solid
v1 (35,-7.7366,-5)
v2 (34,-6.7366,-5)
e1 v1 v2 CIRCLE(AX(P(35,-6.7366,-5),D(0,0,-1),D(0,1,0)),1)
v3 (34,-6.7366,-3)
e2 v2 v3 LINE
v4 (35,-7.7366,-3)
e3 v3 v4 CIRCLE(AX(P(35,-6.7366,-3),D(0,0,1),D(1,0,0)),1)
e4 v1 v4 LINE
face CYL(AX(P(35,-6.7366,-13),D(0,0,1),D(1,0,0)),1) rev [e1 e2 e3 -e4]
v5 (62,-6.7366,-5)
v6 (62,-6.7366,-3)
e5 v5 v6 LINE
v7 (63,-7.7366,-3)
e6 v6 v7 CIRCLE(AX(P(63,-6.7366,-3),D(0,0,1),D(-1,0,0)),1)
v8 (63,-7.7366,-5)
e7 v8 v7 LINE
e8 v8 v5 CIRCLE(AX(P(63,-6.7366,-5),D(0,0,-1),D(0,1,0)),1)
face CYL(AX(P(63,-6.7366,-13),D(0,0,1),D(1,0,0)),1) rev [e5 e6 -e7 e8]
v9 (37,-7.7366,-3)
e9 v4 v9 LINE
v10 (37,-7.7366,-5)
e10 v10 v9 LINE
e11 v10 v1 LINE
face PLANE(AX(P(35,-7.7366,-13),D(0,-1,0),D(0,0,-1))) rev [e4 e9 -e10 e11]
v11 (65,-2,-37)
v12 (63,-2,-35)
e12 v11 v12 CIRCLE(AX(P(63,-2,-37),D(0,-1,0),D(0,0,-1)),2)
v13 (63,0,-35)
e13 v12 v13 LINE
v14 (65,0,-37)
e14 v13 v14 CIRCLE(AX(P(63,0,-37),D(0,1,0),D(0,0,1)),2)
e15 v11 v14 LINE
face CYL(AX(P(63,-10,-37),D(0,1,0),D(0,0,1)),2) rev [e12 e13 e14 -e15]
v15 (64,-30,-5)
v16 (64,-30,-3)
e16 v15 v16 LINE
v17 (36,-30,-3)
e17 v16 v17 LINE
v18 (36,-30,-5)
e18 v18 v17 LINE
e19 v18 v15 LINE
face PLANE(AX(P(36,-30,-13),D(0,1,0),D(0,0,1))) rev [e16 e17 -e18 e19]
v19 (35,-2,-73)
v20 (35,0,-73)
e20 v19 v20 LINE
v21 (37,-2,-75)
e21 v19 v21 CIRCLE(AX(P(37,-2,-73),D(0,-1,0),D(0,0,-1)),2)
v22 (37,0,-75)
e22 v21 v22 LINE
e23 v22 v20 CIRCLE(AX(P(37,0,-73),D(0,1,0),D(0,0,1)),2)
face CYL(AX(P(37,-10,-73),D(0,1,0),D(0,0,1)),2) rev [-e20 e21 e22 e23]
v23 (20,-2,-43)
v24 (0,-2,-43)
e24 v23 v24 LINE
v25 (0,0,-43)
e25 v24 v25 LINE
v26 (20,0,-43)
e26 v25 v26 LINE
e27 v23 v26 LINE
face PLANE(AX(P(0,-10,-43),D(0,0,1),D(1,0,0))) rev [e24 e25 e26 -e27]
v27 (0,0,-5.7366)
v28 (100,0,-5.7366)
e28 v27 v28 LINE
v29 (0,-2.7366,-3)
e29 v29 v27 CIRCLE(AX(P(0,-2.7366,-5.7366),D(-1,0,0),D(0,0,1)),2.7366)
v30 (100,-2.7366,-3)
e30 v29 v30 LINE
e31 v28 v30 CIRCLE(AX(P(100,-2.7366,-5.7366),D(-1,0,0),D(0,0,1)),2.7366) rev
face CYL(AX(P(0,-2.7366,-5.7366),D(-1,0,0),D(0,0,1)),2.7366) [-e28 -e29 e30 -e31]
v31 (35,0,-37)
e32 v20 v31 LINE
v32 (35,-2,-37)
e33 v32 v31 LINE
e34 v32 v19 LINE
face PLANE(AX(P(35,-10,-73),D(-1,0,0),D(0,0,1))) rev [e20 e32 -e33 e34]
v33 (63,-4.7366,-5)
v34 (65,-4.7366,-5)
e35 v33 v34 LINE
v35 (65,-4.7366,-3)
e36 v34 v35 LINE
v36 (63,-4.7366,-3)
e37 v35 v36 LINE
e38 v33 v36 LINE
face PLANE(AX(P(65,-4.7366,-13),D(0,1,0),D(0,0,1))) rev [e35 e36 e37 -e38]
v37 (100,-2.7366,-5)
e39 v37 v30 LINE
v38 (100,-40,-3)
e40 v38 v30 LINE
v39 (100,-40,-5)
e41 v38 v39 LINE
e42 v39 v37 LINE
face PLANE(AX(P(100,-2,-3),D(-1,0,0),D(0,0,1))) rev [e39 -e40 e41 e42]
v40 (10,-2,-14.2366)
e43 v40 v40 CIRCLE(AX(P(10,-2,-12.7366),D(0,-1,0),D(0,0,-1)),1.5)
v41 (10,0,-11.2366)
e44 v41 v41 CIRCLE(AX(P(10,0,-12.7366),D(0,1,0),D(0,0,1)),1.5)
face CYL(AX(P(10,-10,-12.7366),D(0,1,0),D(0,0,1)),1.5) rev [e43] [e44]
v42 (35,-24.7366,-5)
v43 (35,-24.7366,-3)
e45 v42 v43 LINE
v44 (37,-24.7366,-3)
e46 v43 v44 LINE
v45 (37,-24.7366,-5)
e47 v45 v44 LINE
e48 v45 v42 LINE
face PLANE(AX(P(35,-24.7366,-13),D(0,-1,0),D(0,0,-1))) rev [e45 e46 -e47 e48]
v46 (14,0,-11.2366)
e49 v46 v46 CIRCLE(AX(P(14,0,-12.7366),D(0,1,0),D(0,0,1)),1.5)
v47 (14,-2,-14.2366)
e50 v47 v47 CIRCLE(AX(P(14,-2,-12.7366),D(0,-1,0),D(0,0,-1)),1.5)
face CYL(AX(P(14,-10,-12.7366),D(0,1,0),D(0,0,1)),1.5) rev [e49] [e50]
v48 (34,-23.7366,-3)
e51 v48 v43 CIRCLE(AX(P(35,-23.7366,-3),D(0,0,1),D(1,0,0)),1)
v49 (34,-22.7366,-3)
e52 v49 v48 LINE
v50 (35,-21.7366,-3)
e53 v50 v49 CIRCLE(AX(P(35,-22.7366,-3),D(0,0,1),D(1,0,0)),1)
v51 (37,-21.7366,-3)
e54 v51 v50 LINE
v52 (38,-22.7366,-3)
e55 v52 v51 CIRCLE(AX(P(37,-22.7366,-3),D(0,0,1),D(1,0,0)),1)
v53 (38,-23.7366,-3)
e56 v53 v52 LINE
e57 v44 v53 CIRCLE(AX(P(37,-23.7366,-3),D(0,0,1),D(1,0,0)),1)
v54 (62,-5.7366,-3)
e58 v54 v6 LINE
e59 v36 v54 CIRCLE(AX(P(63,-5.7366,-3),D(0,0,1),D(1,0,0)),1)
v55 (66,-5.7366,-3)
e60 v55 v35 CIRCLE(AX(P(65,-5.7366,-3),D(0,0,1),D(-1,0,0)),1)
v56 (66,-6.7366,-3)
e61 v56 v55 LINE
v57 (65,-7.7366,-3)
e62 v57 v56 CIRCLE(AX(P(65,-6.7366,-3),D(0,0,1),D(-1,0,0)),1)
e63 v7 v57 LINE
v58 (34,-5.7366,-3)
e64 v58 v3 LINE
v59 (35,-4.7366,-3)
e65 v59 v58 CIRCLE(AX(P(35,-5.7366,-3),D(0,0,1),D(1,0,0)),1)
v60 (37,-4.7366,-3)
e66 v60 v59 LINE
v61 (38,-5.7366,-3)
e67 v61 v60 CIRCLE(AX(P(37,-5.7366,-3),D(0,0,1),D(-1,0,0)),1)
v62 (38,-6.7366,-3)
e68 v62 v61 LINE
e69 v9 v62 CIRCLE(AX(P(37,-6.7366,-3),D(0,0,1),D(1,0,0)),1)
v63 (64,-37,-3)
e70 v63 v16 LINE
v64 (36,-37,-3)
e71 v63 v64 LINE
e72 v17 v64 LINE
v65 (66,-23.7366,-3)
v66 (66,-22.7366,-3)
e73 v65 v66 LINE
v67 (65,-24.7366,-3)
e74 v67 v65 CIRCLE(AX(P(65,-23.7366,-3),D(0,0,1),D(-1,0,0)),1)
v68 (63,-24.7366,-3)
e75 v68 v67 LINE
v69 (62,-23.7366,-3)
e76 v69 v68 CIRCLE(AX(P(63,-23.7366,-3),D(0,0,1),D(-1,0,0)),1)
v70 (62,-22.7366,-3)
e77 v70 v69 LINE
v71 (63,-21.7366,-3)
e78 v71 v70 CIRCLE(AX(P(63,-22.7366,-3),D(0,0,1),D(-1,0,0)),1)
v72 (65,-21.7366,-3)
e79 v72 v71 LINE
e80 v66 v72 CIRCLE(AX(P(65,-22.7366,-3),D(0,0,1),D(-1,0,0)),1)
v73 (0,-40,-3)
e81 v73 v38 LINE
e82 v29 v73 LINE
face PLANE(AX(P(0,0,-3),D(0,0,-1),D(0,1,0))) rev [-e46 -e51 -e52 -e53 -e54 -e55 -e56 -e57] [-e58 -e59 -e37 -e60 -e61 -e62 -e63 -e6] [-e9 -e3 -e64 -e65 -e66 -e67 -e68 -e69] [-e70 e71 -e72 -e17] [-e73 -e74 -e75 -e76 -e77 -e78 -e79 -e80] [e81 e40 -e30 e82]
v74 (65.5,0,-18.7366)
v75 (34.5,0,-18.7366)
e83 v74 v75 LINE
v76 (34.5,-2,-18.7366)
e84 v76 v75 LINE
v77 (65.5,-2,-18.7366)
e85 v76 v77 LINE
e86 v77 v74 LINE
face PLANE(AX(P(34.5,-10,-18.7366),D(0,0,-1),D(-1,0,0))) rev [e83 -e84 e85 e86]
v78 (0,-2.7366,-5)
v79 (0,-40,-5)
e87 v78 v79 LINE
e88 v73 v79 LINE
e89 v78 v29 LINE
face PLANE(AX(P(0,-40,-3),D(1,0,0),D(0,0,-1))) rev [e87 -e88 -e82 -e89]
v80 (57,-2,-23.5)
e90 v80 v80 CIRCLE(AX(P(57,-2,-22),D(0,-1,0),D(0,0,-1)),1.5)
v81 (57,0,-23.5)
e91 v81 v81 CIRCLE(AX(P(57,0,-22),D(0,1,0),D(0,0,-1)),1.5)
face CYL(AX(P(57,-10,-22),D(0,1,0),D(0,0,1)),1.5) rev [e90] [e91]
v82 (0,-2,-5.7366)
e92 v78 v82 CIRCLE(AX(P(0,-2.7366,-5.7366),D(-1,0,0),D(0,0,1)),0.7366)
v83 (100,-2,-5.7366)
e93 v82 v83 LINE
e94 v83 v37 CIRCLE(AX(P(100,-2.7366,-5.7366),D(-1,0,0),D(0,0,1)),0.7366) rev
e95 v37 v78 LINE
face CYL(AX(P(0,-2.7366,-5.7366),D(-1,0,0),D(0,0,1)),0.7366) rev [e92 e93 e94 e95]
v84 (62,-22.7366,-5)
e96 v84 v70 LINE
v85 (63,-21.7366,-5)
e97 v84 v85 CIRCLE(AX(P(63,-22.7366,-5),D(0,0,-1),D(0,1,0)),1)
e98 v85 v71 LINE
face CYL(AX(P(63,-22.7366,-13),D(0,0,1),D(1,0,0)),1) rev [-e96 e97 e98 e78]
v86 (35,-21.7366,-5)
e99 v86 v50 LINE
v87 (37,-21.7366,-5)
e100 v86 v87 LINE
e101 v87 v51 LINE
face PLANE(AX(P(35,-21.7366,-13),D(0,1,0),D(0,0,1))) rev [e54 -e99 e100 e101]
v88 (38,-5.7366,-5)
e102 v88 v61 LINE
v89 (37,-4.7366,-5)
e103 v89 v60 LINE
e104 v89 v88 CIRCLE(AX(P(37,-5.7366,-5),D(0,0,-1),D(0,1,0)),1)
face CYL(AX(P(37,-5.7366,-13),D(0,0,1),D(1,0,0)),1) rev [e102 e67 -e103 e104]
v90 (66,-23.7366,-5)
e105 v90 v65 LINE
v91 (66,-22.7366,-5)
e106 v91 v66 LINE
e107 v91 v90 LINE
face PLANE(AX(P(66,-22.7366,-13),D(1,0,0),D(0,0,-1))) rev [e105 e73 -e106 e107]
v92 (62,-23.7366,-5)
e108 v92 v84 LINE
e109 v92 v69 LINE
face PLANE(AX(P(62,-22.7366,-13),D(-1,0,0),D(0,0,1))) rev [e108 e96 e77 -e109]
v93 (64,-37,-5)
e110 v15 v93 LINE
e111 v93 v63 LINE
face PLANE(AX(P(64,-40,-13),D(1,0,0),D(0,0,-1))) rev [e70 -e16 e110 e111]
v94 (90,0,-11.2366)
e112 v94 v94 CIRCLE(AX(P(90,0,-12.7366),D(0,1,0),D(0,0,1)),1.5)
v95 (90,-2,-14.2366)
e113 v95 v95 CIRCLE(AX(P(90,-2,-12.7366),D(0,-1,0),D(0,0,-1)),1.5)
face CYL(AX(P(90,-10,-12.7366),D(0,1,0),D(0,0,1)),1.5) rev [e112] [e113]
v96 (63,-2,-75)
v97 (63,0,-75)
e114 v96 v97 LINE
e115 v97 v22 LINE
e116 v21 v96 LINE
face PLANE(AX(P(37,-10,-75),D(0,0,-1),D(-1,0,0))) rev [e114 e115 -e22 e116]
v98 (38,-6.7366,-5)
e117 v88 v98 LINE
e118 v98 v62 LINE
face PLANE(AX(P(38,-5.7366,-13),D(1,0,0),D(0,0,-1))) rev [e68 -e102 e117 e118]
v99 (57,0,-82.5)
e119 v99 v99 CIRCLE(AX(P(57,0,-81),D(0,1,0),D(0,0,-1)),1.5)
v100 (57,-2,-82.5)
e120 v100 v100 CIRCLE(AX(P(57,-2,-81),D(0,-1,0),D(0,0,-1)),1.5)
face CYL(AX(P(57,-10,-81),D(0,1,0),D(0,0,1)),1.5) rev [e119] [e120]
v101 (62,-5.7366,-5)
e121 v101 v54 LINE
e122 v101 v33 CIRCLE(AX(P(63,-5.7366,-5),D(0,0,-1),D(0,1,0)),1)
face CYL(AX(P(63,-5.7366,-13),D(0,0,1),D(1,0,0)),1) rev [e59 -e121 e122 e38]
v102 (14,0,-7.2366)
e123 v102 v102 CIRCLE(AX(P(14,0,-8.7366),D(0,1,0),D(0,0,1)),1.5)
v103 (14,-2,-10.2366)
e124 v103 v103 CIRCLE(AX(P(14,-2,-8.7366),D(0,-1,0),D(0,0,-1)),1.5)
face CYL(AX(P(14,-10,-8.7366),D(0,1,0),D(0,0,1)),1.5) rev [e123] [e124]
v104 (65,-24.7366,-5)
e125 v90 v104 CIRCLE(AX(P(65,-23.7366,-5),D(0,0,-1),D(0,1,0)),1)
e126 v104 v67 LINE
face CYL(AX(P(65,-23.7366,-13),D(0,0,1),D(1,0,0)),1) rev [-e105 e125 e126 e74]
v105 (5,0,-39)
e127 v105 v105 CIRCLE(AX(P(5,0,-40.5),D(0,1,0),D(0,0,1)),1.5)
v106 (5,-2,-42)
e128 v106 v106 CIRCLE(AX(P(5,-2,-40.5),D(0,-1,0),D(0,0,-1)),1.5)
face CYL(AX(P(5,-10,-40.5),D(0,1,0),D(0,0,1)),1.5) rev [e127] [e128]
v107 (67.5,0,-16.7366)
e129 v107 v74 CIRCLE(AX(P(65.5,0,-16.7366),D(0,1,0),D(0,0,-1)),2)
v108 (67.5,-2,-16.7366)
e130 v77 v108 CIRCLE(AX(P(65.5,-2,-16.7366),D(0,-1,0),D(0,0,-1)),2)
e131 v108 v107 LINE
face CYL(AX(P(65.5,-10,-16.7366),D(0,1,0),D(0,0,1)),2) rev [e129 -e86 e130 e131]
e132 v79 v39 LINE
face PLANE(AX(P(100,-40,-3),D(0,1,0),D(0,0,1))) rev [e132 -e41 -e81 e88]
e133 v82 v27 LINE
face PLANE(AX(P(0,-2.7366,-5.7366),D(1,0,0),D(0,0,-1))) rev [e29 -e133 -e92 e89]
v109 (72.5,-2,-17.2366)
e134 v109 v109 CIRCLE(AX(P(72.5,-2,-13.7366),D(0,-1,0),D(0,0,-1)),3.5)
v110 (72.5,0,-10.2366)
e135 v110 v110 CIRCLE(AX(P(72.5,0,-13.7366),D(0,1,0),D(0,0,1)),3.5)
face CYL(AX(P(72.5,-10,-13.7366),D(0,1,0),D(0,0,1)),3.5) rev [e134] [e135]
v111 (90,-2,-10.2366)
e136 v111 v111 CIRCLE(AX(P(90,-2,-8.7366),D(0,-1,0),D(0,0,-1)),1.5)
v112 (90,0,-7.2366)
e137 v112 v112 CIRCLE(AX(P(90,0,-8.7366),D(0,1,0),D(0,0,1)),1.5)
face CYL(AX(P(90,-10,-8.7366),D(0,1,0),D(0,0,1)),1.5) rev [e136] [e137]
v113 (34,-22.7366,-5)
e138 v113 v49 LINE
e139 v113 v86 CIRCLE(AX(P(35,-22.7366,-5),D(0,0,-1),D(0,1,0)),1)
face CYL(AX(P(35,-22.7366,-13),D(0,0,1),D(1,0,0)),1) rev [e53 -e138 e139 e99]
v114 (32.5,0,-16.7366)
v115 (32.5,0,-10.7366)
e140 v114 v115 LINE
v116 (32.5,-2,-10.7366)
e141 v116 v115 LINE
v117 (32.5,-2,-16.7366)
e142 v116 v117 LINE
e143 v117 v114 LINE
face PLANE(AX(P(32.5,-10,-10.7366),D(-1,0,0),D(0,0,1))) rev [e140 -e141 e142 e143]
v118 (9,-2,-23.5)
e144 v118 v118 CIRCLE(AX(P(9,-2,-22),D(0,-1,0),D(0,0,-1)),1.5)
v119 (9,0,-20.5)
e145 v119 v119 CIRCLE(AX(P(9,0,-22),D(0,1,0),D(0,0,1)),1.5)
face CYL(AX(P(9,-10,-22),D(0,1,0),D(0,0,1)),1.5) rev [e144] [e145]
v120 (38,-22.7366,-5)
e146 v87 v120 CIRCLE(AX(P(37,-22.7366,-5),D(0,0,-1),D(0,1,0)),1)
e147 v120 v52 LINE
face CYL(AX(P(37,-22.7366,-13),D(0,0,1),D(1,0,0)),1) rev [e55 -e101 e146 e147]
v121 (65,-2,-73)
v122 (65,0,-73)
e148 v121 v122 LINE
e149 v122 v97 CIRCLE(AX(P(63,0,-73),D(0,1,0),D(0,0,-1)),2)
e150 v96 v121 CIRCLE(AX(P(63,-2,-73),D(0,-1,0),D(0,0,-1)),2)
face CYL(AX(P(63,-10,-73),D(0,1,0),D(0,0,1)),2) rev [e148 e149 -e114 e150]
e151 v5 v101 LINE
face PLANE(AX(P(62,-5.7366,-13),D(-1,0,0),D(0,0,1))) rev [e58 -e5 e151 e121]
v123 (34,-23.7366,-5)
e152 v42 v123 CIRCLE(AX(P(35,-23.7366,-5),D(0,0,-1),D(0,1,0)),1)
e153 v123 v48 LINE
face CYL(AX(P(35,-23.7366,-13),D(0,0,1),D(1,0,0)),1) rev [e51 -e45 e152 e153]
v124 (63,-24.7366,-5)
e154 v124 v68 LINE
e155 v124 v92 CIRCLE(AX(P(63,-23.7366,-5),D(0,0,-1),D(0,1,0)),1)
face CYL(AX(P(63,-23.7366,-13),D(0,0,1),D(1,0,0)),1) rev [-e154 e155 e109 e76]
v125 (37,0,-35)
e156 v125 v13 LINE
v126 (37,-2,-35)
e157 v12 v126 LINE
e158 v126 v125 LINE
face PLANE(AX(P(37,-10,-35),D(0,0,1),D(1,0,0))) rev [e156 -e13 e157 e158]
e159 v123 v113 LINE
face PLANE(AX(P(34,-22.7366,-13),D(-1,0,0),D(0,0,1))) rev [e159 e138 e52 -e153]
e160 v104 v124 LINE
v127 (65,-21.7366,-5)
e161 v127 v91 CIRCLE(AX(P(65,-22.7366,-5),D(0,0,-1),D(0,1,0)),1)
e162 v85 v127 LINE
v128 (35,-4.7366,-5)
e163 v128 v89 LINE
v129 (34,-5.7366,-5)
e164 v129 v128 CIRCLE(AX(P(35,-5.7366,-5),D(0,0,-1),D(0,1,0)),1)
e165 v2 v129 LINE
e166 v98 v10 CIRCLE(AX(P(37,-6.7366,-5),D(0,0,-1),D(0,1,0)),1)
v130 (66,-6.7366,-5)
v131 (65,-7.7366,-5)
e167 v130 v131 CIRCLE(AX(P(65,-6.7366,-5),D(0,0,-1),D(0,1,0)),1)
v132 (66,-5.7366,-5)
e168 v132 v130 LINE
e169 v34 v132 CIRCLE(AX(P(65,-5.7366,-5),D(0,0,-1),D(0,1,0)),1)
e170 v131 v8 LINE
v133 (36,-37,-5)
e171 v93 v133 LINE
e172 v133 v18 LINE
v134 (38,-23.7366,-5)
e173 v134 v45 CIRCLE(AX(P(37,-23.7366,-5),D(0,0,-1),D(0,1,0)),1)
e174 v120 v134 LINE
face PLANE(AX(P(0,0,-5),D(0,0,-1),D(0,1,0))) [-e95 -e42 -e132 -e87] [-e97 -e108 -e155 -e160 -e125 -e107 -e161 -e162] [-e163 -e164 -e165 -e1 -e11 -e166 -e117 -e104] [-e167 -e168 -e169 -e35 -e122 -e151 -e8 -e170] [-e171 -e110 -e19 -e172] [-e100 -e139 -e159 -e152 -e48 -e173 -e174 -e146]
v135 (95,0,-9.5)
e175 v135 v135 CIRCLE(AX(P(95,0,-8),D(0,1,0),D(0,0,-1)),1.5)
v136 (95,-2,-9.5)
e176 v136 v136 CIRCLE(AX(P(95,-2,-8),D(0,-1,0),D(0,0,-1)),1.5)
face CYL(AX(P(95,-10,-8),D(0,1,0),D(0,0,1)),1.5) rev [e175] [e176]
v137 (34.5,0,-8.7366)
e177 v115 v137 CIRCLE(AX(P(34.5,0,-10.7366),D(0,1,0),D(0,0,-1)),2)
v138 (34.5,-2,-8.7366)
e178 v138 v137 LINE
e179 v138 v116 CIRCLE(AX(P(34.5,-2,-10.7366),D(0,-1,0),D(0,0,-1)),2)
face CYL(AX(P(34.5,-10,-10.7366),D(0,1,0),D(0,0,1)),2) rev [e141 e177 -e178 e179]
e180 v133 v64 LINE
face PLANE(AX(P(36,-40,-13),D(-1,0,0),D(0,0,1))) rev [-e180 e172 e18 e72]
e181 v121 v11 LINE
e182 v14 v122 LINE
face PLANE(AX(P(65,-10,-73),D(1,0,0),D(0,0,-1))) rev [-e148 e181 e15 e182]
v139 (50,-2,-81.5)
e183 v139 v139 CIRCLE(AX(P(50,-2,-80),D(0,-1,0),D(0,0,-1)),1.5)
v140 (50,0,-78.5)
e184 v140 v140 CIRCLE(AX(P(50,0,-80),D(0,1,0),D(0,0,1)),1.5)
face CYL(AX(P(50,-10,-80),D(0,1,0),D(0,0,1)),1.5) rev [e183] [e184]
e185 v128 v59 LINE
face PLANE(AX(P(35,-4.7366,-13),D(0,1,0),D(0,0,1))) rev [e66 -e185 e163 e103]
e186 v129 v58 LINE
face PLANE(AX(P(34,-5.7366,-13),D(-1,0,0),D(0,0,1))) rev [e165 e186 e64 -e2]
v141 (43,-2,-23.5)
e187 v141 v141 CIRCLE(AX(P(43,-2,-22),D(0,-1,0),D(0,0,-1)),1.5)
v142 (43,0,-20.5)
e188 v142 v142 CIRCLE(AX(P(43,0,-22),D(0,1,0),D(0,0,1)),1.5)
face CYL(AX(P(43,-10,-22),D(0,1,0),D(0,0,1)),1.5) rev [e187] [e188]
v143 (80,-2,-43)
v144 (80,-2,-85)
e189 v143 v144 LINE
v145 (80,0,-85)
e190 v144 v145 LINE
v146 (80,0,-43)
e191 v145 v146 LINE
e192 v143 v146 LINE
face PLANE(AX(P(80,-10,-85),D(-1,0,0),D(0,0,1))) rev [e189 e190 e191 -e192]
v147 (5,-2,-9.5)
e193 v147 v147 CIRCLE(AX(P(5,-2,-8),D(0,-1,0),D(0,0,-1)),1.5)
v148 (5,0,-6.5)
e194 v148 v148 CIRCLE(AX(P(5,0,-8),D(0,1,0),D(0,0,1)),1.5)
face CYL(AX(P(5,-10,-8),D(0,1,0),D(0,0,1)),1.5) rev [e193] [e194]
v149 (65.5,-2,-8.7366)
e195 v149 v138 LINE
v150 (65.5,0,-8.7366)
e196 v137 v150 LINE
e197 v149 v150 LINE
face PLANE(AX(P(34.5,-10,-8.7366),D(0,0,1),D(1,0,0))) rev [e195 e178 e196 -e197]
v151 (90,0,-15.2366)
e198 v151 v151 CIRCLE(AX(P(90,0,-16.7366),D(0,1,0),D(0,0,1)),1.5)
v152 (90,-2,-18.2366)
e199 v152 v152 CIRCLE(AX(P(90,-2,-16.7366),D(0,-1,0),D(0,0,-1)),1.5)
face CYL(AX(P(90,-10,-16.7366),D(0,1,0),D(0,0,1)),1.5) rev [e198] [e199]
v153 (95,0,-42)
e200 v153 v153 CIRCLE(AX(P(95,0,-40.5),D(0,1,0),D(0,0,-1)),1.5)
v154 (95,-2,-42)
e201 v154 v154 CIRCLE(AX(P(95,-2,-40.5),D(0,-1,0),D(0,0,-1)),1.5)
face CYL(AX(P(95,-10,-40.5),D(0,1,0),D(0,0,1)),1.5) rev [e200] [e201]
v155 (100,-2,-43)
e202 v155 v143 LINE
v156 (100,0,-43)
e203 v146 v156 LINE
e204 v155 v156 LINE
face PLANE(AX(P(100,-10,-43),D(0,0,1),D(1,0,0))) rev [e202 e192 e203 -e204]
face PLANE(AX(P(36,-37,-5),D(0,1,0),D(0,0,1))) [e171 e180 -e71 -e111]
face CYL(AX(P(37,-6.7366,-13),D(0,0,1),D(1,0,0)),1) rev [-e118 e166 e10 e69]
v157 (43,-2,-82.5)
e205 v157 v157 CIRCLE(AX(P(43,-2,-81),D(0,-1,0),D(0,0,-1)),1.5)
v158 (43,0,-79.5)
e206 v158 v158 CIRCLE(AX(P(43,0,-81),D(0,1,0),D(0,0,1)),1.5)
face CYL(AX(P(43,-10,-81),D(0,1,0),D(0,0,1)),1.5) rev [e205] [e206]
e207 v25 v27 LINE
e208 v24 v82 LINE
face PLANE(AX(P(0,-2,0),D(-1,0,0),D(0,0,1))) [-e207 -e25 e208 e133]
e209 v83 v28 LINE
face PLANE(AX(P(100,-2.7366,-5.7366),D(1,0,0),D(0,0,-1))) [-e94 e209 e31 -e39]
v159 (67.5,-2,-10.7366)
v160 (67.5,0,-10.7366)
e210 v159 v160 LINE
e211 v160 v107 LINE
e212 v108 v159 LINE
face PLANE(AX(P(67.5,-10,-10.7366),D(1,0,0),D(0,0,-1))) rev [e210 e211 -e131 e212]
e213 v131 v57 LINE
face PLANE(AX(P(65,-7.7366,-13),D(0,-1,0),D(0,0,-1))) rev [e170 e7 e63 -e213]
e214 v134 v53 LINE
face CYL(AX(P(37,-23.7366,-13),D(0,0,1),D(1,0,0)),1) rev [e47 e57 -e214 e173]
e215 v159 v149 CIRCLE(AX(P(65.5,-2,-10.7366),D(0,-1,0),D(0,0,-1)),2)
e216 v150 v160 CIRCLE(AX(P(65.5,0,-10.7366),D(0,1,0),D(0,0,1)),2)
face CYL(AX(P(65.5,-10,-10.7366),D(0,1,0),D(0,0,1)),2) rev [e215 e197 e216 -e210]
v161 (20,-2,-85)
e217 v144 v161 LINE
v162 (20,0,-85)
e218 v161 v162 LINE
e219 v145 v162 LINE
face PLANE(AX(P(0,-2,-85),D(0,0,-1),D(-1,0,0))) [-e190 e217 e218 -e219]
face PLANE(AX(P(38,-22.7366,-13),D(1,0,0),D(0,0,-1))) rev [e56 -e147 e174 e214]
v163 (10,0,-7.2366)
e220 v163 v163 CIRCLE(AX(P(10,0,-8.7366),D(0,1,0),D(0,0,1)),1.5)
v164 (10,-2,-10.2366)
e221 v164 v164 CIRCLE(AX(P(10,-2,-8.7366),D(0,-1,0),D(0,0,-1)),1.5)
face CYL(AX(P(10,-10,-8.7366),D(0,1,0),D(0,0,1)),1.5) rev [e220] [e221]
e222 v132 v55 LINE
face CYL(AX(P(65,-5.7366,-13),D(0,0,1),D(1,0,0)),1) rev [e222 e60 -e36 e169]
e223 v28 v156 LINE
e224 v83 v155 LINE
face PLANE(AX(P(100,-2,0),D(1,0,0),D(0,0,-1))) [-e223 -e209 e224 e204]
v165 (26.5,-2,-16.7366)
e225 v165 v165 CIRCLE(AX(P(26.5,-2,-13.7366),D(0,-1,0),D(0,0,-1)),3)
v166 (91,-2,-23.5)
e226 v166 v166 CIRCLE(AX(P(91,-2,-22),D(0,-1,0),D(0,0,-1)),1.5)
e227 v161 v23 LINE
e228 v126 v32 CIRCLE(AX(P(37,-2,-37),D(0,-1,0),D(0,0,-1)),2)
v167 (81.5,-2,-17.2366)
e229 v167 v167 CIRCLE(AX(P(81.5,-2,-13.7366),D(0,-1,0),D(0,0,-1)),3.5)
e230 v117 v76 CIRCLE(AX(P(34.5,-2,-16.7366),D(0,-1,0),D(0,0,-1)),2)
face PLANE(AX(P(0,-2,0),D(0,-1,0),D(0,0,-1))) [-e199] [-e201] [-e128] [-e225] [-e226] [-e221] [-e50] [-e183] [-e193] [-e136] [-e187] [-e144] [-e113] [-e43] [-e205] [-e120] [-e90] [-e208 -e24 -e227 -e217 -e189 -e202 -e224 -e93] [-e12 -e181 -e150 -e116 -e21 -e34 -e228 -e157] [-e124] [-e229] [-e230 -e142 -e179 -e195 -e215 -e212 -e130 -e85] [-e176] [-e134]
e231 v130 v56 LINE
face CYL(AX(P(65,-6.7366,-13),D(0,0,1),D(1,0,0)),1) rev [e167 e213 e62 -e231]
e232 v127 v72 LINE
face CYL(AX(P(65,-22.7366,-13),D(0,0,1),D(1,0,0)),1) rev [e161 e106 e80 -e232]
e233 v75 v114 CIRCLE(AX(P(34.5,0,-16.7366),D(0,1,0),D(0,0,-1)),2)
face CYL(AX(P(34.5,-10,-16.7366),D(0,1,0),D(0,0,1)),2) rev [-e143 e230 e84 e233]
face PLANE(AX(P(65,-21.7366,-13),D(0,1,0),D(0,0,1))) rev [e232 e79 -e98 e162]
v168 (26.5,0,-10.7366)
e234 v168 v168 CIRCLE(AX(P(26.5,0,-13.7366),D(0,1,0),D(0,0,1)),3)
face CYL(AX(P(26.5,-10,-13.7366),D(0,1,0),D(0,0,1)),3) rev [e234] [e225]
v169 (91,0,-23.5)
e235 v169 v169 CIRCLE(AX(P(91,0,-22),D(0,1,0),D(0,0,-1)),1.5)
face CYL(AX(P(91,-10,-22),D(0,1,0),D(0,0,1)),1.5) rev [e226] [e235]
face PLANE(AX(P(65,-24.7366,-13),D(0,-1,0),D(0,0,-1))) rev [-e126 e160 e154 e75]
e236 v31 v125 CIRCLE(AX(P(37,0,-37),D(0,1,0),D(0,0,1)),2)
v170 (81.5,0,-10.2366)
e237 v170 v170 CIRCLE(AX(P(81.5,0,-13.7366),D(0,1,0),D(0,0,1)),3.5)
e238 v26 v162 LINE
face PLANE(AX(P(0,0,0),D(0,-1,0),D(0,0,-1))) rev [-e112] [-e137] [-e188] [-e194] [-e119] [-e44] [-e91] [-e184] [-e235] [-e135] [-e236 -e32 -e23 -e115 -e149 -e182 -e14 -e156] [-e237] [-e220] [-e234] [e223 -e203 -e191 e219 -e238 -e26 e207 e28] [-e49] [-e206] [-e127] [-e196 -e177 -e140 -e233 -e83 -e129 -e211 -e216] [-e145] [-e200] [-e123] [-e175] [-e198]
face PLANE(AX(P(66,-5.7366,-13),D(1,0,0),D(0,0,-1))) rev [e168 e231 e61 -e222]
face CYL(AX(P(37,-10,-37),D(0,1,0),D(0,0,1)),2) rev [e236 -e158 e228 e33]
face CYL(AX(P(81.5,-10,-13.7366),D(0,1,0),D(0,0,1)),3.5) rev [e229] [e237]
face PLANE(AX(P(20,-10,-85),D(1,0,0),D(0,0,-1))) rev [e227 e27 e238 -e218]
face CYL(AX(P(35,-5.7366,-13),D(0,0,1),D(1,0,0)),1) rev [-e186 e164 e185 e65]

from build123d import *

# Parameters (mm, degrees)
SKETCH2_W                    = 100
SKETCH2_H                    = 85
BASE_FLANGE1_DEPTH           = 2
SKETCH15_R                   = 1.5
SKETCH15_W                   = 20
SKETCH15_H                   = 42
SKETCH15_W_2                 = 100
SKETCH15_H_2                 = 3
CUT_EXTRUDE2_DEPTH           = 10
EDGE_FLANGE3_STRIP_W         = 9.4732
EDGE_FLANGE3_STRIP_H         = 2
EDGE_FLANGE3_STRIP_CUT_DEPTH = 100
EDGE_FLANGE3_DEPTH           = 100
SKETCH23_W                   = 28
SKETCH23_H                   = 10
CUT_EXTRUDE3_DEPTH           = 10
SKETCH24_W                   = 28
SKETCH24_H                   = 3
TAB1_DEPTH                   = 2
SKETCH25_R                   = 1.5
CUT_EXTRUDE11_DEPTH          = 10
CUT_EXTRUDE7_DEPTH           = 10
CUT_EXTRUDE9_DEPTH           = 10
SKETCH34_R                   = 1.5
CUT_EXTRUDE10_DEPTH          = 10
SKETCH35_R                   = 3
SKETCH35_R_2                 = 3.5
CUT_EXTRUDE12_DEPTH          = 10


# Sheet-metal steps are written as plain solids
with BuildPart() as part:
    # Sketch2 → Base-Flange1 (new body)
    with BuildSketch(Plane(origin=(0, 0, 0), x_dir=(1, 0, 0), z_dir=(0, 1, 0))):
        with Locations((50, 42.5)):
            Rectangle(SKETCH2_W, SKETCH2_H)
    extrude(amount=-BASE_FLANGE1_DEPTH)

    # Sketch15 → Cut-Extrude2 (cut)
    with BuildSketch(Plane(origin=(0, 0, 0), x_dir=(1, 0, 0), z_dir=(0, 1, 0))):
        with Locations(Location((5, 8, 0), (0, 0, 270))):
            Circle(SKETCH15_R)
        with Locations(Location((5, 40.5, 0), (0, 0, 270))):
            Circle(SKETCH15_R)
        with Locations(Location((50, 80, 0), (0, 0, 270))):
            Circle(SKETCH15_R)
        with Locations(Location((95, 8, 0), (0, 0, 90))):
            Circle(SKETCH15_R)
        with Locations(Location((95, 40.5, 0), (0, 0, 90))):
            Circle(SKETCH15_R)
        with Locations((10, 64)):
            Rectangle(SKETCH15_W, SKETCH15_H)
        with Locations((90, 64)):
            Rectangle(SKETCH15_W, SKETCH15_H)
        with Locations((50, 1.5)):
            Rectangle(SKETCH15_W_2, SKETCH15_H_2)
    extrude(amount=-CUT_EXTRUDE2_DEPTH, mode=Mode.SUBTRACT)

    # Edge-Flange3 strip (across the edge) → Edge-Flange3 strip cut (cut)
    with BuildSketch(Plane(origin=(100, -2, -3), x_dir=(0, 0, -1), z_dir=(-1, 0, 0))):
        with Locations((-2, -1)):
            Rectangle(EDGE_FLANGE3_STRIP_W, EDGE_FLANGE3_STRIP_H)
    extrude(amount=EDGE_FLANGE3_STRIP_CUT_DEPTH, mode=Mode.SUBTRACT)

    # Edge-Flange3 section (across the edge) → Edge-Flange3 (add)
    with BuildSketch(Plane(origin=(100, -2, -3), x_dir=(0, 0, -1), z_dir=(-1, 0, 0))):
        with BuildLine():
            Line((0, 0.7366), (0, 38))
            Line((0, 38), (2, 38))
            Line((2, 38), (2, 0.7366))
            ThreePointArc((2, 0.7366), (2.215745145, 0.215745145), (2.7366, 0))
            Line((2.7366, 0), (2.7366, -2))
            ThreePointArc((2.7366, -2), (0.801531583, -1.198468417), (0, 0.7366))
        make_face()
    extrude(amount=EDGE_FLANGE3_DEPTH)

    # Sketch23 → Cut-Extrude3 (cut)
    with BuildSketch(Plane.XY.offset(-3)):
        with Locations((50, -35)):
            Rectangle(SKETCH23_W, SKETCH23_H)
    extrude(amount=-CUT_EXTRUDE3_DEPTH, mode=Mode.SUBTRACT)

    # Sketch24 → Tab1 (add)
    with BuildSketch(Plane.XY.offset(-3)):
        with Locations((50, -38.5)):
            Rectangle(SKETCH24_W, SKETCH24_H)
    extrude(amount=-TAB1_DEPTH)

    # Sketch25 → Cut-Extrude11 (cut)
    with BuildSketch(Plane(origin=(0, 0, 0), x_dir=(1, 0, 0), z_dir=(0, 1, 0))):
        with Locations(Location((43, 81, 0), (0, 0, 270))):
            Circle(SKETCH25_R)
        with Locations(Location((43, 22, 0), (0, 0, 270))):
            Circle(SKETCH25_R)
        with Locations(Location((9, 22, 0), (0, 0, 270))):
            Circle(SKETCH25_R)
        with Locations(Location((91, 22, 0), (0, 0, 90))):
            Circle(SKETCH25_R)
        with Locations(Location((57, 22, 0), (0, 0, 90))):
            Circle(SKETCH25_R)
        with Locations(Location((57, 81, 0), (0, 0, 90))):
            Circle(SKETCH25_R)
        with BuildLine():
            Line((37, 75), (63, 75))
            ThreePointArc((63, 75), (64.414213562, 74.414213562), (65, 73))
            Line((65, 73), (65, 37))
            ThreePointArc((65, 37), (64.414213562, 35.585786438), (63, 35))
            Line((63, 35), (37, 35))
            ThreePointArc((37, 35), (35.585786438, 35.585786438), (35, 37))
            Line((35, 37), (35, 73))
            ThreePointArc((35, 73), (35.585786438, 74.414213562), (37, 75))
        make_face()
    extrude(amount=-CUT_EXTRUDE11_DEPTH, mode=Mode.SUBTRACT)

    # Sketch28 → Cut-Extrude7 (cut)
    with BuildSketch(Plane(origin=(0, 0, 0), x_dir=(1, 0, 0), z_dir=(0, 1, 0))):
        with BuildLine():
            Line((34.5, 8.7366), (65.5, 8.7366))
            ThreePointArc((65.5, 8.7366), (66.914213562, 9.322386438), (67.5, 10.7366))
            Line((67.5, 10.7366), (67.5, 16.7366))
            ThreePointArc((67.5, 16.7366), (66.914213562, 18.150813562), (65.5, 18.7366))
            Line((65.5, 18.7366), (34.5, 18.7366))
            ThreePointArc((34.5, 18.7366), (33.085786438, 18.150813562), (32.5, 16.7366))
            Line((32.5, 16.7366), (32.5, 10.7366))
            ThreePointArc((32.5, 10.7366), (33.085786438, 9.322386438), (34.5, 8.7366))
        make_face()
    extrude(amount=-CUT_EXTRUDE7_DEPTH, mode=Mode.SUBTRACT)

    # Sketch33 → Cut-Extrude9 (cut)
    with BuildSketch(Plane.XY.offset(-3)):
        with BuildLine():
            Line((35, -4.7366), (37, -4.7366))
            ThreePointArc((37, -4.7366), (37.707106781, -5.029493219), (38, -5.7366))
            Line((38, -5.7366), (38, -6.7366))
            ThreePointArc((38, -6.7366), (37.707106781, -7.443706781), (37, -7.7366))
            Line((37, -7.7366), (35, -7.7366))
            ThreePointArc((35, -7.7366), (34.292893219, -7.443706781), (34, -6.7366))
            Line((34, -6.7366), (34, -5.7366))
            ThreePointArc((34, -5.7366), (34.292893219, -5.029493219), (35, -4.7366))
        make_face()
        with BuildLine():
            Line((35, -21.7366), (37, -21.7366))
            ThreePointArc((37, -21.7366), (37.707106781, -22.029493219), (38, -22.7366))
            Line((38, -22.7366), (38, -23.7366))
            ThreePointArc((38, -23.7366), (37.707106781, -24.443706781), (37, -24.7366))
            Line((37, -24.7366), (35, -24.7366))
            ThreePointArc((35, -24.7366), (34.292893219, -24.443706781), (34, -23.7366))
            Line((34, -23.7366), (34, -22.7366))
            ThreePointArc((34, -22.7366), (34.292893219, -22.029493219), (35, -21.7366))
        make_face()
        with BuildLine():
            Line((65, -24.7366), (63, -24.7366))
            ThreePointArc((63, -24.7366), (62.292893219, -24.443706781), (62, -23.7366))
            Line((62, -23.7366), (62, -22.7366))
            ThreePointArc((62, -22.7366), (62.292893219, -22.029493219), (63, -21.7366))
            Line((63, -21.7366), (65, -21.7366))
            ThreePointArc((65, -21.7366), (65.707106781, -22.029493219), (66, -22.7366))
            Line((66, -22.7366), (66, -23.7366))
            ThreePointArc((66, -23.7366), (65.707106781, -24.443706781), (65, -24.7366))
        make_face()
        with BuildLine():
            Line((65, -7.7366), (63, -7.7366))
            ThreePointArc((63, -7.7366), (62.292893219, -7.443706781), (62, -6.7366))
            Line((62, -6.7366), (62, -5.7366))
            ThreePointArc((62, -5.7366), (62.292893219, -5.029493219), (63, -4.7366))
            Line((63, -4.7366), (65, -4.7366))
            ThreePointArc((65, -4.7366), (65.707106781, -5.029493219), (66, -5.7366))
            Line((66, -5.7366), (66, -6.7366))
            ThreePointArc((66, -6.7366), (65.707106781, -7.443706781), (65, -7.7366))
        make_face()
    extrude(amount=-CUT_EXTRUDE9_DEPTH, mode=Mode.SUBTRACT)

    # Sketch34 → Cut-Extrude10 (cut)
    with BuildSketch(Plane(origin=(0, 0, 0), x_dir=(1, 0, 0), z_dir=(0, 1, 0))):
        with Locations(Location((10, 8.7366, 0), (0, 0, 270))):
            Circle(SKETCH34_R)
        with Locations(Location((90, 8.7366, 0), (0, 0, 270))):
            Circle(SKETCH34_R)
        with Locations(Location((14, 8.7366, 0), (0, 0, 270))):
            Circle(SKETCH34_R)
        with Locations(Location((14, 12.7366, 0), (0, 0, 270))):
            Circle(SKETCH34_R)
        with Locations(Location((10, 12.7366, 0), (0, 0, 270))):
            Circle(SKETCH34_R)
        with Locations(Location((90, 12.7366, 0), (0, 0, 270))):
            Circle(SKETCH34_R)
        with Locations(Location((90, 16.7366, 0), (0, 0, 270))):
            Circle(SKETCH34_R)
    extrude(amount=-CUT_EXTRUDE10_DEPTH, mode=Mode.SUBTRACT)

    # Sketch35 → Cut-Extrude12 (cut)
    with BuildSketch(Plane(origin=(0, 0, 0), x_dir=(1, 0, 0), z_dir=(0, 1, 0))):
        with Locations(Location((26.5, 13.7366, 0), (0, 0, 270))):
            Circle(SKETCH35_R)
        with Locations(Location((72.5, 13.7366, 0), (0, 0, 270))):
            Circle(SKETCH35_R_2)
        with Locations(Location((81.5, 13.7366, 0), (0, 0, 270))):
            Circle(SKETCH35_R_2)
    extrude(amount=-CUT_EXTRUDE12_DEPTH, mode=Mode.SUBTRACT)


solid = part.part
